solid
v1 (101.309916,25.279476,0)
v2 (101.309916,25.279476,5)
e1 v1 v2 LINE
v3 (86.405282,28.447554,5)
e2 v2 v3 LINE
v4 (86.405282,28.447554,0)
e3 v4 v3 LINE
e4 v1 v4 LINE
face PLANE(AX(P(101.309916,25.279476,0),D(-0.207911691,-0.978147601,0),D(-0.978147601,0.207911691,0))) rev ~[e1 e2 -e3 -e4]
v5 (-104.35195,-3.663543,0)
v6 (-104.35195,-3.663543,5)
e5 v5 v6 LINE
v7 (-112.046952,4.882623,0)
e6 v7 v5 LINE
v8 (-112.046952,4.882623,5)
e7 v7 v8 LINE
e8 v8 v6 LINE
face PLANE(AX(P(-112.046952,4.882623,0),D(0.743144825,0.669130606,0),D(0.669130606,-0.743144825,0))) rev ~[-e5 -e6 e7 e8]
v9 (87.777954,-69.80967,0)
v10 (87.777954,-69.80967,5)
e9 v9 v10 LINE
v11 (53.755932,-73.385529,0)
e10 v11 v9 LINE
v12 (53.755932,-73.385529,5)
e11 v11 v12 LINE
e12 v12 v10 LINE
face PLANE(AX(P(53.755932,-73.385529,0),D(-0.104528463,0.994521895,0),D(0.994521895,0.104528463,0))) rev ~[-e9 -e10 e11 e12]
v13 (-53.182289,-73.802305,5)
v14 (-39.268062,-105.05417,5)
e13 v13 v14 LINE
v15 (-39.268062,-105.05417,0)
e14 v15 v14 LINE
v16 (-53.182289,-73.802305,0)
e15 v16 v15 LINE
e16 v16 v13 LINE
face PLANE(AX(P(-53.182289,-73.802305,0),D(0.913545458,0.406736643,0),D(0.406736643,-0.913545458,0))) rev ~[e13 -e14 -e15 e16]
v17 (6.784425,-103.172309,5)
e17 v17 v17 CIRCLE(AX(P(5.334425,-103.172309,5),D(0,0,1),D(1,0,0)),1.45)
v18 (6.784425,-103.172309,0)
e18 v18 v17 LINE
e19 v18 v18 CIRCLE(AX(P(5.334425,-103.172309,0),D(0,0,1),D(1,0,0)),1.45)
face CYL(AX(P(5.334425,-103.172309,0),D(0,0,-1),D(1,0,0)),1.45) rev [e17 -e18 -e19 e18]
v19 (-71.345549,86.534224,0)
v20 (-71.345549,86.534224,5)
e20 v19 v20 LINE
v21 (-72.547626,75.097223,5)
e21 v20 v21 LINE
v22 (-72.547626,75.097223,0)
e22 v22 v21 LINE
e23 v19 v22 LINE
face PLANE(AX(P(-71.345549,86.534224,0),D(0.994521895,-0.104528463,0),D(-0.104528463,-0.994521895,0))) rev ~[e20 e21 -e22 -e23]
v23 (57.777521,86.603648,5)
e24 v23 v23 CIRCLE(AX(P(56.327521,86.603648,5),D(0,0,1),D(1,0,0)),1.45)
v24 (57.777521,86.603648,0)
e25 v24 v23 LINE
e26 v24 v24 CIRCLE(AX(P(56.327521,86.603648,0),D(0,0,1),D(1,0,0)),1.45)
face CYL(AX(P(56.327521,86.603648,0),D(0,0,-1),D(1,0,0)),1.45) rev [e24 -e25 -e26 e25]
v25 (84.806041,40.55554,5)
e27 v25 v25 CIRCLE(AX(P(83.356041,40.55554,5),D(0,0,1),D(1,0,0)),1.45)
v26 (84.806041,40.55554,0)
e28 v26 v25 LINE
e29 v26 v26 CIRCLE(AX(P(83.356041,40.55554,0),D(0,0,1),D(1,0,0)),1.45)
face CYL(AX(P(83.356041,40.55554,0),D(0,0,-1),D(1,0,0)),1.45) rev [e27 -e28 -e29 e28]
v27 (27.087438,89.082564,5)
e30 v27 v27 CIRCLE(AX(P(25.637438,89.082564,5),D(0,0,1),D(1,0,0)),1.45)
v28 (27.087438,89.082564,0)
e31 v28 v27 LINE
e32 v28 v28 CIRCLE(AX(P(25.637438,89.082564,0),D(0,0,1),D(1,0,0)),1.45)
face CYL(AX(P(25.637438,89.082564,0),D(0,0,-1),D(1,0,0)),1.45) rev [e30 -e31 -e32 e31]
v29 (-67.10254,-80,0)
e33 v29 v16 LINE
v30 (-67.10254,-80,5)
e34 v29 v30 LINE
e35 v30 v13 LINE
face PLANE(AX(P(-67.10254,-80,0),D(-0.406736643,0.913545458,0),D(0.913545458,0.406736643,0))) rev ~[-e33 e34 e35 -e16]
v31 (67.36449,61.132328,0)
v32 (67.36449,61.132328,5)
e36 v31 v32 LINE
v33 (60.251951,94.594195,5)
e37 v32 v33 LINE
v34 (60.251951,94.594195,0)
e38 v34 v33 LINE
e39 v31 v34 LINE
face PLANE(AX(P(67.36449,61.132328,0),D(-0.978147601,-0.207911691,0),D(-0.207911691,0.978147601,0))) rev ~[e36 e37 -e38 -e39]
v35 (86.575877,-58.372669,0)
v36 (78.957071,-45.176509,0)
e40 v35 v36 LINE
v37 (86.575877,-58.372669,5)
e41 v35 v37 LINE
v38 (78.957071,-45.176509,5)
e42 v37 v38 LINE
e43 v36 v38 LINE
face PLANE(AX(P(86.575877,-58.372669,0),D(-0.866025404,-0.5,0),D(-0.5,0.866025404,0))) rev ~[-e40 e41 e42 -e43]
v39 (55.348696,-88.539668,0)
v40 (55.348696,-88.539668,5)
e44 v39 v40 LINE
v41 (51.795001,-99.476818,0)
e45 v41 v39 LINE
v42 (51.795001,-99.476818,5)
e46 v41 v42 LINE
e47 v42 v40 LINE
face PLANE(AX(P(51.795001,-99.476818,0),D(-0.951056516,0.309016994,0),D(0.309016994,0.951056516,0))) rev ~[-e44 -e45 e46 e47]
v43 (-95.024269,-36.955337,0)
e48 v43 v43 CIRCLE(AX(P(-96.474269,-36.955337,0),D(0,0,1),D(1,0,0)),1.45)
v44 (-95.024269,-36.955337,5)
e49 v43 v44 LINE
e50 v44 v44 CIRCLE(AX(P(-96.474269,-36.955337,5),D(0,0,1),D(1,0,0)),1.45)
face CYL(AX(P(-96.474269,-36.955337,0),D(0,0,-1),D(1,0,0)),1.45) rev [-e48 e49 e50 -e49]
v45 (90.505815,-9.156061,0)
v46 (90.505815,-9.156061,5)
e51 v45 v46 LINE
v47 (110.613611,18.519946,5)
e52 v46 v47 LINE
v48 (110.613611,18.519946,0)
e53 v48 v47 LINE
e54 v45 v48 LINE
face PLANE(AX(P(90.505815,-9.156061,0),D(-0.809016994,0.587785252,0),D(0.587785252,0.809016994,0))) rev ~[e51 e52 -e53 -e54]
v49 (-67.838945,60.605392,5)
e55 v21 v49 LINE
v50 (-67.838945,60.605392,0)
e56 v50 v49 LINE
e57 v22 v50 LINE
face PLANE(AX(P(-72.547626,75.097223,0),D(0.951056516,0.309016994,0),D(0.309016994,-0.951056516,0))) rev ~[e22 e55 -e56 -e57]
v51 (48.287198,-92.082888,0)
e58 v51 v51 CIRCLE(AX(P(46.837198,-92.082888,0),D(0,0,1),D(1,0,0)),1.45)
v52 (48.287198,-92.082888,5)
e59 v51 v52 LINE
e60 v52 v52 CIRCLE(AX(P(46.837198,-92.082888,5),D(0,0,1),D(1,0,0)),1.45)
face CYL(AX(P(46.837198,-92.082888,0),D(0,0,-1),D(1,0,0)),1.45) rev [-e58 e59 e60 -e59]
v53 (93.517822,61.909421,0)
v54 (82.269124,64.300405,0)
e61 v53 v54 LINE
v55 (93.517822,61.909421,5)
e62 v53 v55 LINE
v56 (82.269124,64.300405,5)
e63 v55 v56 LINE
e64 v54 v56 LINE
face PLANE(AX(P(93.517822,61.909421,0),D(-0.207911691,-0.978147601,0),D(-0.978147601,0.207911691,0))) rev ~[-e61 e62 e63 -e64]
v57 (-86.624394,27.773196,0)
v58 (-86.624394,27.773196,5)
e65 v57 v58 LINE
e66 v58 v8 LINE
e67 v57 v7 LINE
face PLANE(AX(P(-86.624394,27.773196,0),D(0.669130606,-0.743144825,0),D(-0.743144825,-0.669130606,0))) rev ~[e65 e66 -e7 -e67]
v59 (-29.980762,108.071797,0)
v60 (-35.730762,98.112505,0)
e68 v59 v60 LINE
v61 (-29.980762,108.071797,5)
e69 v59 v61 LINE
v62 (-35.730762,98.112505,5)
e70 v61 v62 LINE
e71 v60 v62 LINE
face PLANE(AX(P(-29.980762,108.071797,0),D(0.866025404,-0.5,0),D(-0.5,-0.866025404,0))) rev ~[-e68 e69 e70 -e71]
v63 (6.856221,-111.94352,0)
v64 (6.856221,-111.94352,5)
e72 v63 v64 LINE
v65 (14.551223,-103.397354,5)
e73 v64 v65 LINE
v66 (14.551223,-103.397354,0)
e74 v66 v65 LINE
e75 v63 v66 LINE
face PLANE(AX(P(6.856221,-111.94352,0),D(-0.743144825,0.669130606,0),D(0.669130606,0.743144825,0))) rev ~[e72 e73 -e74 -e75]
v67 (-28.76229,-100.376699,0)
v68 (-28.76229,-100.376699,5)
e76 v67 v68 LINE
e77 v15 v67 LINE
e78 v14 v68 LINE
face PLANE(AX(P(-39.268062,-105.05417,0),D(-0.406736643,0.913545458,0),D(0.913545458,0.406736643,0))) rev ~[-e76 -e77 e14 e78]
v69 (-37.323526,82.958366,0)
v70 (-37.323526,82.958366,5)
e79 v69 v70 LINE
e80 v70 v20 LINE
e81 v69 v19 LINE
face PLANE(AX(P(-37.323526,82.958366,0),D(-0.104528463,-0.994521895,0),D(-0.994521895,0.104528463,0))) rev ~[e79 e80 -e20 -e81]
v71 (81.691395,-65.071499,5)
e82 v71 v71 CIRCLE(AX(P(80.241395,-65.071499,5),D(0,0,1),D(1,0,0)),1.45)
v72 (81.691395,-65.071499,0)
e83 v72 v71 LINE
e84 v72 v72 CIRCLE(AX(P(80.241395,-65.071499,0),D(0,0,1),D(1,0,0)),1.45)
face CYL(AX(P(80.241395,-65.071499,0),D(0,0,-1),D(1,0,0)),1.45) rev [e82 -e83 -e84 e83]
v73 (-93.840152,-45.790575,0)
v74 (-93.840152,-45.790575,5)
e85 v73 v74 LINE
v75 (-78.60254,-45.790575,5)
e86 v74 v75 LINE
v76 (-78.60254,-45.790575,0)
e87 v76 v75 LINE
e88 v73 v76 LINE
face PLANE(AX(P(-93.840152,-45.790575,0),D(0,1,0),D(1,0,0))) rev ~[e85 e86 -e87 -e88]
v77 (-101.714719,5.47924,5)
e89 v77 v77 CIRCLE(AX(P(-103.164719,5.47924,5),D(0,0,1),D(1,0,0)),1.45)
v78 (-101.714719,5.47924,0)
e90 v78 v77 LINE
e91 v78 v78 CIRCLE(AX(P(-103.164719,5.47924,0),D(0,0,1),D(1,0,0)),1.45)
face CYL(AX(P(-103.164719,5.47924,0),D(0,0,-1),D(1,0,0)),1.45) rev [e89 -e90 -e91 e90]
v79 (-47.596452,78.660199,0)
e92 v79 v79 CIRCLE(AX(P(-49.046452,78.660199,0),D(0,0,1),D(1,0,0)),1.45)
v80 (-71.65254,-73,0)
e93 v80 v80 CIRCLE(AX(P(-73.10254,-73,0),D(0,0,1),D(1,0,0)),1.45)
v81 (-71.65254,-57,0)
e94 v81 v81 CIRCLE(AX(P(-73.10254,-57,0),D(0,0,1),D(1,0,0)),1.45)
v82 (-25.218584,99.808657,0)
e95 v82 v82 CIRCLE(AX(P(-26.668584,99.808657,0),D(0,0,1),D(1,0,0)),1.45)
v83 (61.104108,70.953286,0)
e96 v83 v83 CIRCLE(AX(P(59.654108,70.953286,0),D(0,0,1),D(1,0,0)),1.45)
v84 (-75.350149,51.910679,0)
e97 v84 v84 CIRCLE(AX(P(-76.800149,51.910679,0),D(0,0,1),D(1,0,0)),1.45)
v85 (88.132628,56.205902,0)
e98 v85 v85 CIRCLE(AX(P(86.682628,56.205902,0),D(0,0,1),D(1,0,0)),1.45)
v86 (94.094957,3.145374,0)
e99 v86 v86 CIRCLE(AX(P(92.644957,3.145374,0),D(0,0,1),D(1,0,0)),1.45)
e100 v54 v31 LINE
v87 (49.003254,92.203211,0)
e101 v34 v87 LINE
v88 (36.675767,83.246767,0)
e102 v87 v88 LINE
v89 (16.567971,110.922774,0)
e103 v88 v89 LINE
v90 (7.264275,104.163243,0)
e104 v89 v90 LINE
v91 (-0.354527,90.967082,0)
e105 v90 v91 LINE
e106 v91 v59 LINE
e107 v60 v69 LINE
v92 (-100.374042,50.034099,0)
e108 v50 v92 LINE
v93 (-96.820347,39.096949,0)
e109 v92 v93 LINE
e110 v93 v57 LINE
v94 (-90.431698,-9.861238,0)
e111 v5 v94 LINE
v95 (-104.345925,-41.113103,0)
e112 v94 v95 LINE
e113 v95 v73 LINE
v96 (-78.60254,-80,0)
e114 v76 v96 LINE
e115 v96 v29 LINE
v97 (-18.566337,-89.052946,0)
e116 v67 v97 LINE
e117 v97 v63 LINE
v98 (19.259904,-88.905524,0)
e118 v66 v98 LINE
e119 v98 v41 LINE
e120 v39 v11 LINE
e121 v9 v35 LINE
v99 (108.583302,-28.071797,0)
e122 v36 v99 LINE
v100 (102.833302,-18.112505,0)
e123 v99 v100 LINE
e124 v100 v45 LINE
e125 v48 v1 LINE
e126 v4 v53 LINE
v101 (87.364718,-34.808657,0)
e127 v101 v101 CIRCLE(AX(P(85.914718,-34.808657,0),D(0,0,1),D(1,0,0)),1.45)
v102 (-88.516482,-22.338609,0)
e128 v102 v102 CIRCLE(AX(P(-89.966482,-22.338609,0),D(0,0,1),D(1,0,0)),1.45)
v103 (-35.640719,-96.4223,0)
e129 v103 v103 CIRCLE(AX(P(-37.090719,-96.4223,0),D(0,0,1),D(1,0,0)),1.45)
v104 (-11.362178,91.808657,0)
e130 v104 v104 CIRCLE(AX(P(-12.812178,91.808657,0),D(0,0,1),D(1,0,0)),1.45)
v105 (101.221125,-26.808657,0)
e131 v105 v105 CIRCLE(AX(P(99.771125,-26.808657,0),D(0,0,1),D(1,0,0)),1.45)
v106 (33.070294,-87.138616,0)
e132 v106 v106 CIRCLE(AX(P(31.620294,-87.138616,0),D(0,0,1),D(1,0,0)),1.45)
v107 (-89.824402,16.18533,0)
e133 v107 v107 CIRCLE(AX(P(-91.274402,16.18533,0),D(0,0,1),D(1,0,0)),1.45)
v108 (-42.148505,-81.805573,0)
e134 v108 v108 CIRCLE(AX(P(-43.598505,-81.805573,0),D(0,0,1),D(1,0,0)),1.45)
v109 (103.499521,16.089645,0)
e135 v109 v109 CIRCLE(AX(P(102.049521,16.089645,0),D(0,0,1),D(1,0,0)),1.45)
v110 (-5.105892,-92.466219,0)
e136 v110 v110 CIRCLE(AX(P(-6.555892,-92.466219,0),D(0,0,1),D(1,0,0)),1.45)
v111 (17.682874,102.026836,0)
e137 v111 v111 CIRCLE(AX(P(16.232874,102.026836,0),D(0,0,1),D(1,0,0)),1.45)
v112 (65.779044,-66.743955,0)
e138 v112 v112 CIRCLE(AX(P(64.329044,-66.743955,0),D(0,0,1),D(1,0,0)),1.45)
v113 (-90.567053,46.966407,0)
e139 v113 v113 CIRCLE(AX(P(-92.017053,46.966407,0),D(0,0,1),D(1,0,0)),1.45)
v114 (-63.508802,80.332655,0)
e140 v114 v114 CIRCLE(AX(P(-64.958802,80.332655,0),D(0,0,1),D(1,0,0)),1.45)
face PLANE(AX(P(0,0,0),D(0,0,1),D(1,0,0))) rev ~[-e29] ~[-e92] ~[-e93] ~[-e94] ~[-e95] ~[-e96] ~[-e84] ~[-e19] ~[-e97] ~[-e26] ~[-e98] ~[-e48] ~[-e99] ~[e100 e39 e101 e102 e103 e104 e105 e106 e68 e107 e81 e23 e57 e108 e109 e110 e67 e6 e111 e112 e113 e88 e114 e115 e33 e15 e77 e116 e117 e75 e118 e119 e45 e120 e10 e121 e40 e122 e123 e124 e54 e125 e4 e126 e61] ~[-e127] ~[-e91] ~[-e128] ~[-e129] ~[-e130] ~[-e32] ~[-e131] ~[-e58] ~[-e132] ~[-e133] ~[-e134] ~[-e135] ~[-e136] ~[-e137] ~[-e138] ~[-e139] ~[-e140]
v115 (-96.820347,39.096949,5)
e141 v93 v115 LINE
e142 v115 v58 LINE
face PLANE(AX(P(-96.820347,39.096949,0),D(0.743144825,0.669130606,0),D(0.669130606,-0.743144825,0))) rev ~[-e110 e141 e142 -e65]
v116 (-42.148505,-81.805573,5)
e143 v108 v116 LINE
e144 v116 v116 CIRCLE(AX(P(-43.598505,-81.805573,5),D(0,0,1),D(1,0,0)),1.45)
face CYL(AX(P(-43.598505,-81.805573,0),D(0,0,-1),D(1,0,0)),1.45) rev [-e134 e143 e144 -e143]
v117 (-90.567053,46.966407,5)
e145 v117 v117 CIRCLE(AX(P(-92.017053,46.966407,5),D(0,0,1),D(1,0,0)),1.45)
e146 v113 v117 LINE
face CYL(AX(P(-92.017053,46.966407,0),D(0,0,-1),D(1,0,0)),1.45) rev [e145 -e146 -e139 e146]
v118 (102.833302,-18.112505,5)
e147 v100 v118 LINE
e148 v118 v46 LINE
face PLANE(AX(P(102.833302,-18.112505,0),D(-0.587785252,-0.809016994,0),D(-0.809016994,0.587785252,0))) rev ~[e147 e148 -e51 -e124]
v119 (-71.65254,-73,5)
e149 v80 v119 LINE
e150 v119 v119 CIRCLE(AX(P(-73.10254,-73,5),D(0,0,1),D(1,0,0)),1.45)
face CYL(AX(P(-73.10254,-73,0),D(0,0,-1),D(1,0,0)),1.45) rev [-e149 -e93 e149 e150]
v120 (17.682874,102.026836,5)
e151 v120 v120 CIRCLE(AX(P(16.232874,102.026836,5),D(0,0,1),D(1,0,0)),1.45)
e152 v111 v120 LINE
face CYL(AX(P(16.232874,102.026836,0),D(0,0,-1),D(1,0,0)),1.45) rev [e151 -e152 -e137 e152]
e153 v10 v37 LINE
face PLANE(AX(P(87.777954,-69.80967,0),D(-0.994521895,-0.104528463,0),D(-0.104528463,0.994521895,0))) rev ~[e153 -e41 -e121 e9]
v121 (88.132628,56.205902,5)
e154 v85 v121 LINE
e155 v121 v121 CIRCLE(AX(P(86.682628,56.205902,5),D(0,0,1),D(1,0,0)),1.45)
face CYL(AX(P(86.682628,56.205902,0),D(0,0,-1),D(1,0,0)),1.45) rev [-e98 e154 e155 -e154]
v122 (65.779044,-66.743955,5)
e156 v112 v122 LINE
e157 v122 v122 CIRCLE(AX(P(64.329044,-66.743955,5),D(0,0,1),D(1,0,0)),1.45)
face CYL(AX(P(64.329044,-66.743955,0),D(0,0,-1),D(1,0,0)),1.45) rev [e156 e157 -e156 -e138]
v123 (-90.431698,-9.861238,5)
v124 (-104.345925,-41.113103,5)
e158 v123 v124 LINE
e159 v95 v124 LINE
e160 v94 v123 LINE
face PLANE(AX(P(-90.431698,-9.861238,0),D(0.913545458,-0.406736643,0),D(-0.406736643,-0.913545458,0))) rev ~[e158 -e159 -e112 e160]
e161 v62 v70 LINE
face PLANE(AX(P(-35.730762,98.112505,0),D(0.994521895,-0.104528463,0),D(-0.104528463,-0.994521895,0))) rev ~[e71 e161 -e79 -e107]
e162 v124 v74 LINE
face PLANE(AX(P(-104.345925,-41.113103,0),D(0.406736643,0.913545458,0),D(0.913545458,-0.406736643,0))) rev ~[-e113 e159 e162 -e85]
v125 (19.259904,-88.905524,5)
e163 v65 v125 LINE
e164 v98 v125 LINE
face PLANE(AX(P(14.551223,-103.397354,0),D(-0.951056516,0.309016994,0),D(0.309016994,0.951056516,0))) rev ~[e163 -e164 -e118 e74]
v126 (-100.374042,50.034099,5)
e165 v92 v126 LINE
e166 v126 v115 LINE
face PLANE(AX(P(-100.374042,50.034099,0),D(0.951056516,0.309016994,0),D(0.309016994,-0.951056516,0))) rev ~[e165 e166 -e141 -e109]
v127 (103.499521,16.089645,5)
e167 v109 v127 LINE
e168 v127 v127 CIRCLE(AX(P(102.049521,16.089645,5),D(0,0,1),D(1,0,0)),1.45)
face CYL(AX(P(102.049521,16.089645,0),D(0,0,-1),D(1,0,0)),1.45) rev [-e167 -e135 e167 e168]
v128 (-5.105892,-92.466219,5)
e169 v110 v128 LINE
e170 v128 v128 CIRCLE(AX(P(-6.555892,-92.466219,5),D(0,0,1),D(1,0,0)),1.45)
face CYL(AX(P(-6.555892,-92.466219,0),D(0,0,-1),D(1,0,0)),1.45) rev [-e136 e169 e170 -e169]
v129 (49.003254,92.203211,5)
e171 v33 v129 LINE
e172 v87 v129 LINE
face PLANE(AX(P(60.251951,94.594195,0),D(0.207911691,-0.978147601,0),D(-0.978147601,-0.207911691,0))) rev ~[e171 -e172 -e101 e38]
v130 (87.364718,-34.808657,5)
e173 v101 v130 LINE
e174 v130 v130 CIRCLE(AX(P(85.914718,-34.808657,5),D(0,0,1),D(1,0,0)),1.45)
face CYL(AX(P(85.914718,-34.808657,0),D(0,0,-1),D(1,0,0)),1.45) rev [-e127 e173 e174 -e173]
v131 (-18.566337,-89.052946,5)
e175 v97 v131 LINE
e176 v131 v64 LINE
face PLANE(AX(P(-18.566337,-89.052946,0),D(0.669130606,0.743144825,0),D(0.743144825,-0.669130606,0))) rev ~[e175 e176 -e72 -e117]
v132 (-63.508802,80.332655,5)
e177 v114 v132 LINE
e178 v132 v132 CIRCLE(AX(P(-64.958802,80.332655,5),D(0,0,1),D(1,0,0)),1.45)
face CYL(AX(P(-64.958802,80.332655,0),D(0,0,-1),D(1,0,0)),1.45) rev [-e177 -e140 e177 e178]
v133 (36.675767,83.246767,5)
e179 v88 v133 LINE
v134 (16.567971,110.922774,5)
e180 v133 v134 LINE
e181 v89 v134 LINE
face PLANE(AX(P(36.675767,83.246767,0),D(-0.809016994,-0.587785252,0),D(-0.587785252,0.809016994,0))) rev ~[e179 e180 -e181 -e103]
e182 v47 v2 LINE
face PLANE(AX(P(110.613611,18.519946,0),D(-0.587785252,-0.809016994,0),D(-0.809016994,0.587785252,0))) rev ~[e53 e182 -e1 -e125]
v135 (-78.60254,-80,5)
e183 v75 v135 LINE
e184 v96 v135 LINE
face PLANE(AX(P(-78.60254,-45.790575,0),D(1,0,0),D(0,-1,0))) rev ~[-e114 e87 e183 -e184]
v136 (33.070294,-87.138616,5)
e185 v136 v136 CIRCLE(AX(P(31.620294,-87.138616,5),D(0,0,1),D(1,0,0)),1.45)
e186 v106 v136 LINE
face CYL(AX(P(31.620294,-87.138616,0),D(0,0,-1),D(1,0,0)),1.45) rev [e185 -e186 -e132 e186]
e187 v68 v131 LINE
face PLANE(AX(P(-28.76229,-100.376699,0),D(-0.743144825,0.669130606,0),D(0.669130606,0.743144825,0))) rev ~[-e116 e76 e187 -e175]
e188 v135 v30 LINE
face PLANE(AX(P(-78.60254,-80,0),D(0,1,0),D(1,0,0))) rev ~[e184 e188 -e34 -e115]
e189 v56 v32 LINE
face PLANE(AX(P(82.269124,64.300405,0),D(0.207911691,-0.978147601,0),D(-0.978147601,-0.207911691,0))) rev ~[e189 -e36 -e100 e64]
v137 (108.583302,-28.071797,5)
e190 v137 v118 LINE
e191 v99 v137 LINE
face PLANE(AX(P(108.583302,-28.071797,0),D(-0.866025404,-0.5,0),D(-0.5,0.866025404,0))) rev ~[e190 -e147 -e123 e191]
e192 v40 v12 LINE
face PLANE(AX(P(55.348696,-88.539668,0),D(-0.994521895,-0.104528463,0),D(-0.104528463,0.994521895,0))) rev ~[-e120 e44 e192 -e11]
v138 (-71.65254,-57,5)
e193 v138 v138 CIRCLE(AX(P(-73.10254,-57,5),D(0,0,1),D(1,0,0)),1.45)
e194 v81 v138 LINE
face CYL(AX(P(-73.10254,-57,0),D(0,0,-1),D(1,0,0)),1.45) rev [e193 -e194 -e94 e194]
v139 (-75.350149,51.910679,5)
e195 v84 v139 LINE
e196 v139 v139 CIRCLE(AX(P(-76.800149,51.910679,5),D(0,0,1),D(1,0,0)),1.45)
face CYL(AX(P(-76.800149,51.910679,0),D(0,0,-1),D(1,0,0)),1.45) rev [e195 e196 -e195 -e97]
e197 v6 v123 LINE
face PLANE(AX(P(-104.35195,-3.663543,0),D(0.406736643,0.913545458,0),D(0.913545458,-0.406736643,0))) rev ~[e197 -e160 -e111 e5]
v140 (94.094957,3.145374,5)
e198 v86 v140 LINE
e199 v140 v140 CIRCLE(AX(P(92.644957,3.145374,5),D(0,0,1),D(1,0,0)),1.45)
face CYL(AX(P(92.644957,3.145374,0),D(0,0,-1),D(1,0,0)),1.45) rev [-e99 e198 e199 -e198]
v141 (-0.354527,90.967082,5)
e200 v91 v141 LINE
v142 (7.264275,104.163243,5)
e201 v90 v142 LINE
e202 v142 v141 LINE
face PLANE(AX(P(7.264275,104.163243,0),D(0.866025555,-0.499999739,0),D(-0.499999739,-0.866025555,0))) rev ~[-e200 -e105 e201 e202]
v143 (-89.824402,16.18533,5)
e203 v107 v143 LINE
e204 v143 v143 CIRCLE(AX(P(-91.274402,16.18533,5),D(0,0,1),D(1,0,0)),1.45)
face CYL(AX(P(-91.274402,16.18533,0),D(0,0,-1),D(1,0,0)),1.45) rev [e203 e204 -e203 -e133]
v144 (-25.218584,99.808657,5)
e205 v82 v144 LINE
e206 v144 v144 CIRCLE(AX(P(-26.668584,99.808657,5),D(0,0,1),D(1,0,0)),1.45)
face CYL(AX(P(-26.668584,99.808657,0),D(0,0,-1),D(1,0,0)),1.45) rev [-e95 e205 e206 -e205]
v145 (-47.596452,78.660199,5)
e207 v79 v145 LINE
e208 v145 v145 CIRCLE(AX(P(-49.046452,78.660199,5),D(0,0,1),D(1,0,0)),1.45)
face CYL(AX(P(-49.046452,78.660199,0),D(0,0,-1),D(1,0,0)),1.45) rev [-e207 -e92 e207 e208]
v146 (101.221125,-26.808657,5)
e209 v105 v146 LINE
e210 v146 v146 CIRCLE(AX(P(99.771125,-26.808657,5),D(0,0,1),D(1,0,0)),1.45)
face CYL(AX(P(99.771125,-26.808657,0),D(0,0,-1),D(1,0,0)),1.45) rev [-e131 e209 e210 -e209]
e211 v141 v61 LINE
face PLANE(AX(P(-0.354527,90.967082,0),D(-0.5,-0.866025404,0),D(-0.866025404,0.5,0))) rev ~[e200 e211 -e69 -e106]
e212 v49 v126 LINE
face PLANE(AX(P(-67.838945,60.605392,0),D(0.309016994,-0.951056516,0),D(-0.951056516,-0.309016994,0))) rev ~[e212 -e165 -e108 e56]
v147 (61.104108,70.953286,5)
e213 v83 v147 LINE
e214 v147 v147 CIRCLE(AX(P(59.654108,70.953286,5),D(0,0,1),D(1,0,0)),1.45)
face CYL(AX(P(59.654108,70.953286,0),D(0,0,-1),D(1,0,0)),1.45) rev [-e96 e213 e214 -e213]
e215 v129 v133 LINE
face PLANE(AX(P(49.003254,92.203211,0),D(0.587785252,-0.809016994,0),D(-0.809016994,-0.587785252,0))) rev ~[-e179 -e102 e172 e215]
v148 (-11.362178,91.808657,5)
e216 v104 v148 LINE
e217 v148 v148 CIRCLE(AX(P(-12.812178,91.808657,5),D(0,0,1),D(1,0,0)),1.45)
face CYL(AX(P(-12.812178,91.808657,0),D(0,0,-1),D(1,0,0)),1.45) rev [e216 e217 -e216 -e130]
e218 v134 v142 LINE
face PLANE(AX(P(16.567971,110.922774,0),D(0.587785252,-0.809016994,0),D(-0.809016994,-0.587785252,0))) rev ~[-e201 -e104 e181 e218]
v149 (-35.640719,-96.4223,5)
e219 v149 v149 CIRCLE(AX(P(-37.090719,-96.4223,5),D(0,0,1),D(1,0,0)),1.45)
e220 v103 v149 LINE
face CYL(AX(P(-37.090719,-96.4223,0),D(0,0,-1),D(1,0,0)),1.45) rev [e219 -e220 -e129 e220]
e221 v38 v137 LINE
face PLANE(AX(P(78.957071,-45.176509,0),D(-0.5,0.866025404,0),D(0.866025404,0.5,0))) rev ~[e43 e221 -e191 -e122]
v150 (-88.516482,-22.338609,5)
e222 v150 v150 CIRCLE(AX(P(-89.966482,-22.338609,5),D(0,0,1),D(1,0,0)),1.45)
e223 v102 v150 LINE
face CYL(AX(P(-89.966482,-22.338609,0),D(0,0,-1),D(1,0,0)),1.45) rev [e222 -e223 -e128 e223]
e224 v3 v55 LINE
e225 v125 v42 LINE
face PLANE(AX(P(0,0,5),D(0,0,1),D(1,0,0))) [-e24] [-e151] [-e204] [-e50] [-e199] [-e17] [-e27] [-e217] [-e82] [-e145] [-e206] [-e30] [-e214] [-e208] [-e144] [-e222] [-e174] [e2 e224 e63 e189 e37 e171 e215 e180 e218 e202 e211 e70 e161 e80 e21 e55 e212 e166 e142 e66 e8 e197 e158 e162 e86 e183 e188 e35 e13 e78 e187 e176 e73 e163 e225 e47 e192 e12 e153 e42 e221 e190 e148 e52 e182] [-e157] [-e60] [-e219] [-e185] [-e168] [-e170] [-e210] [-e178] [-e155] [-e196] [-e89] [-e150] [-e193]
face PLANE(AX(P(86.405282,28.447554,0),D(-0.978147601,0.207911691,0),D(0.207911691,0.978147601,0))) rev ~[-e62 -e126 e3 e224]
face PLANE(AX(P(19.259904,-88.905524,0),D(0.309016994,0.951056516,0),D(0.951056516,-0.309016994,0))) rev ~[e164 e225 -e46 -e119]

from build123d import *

# Parameters (mm, degrees)
F0_R     = 1.45
F1_DEPTH = 5


# Not quite as in the source:
# - ends of sketch curves that miss each other by under 0.0002 mm in the source are joined


with BuildPart() as f1:
    # F0 (on Top) → F1 (new body)
    with BuildSketch(Plane.XY):
        Polygon((-0.3545266845, 90.9670817697), (-29.9807621135, 108.0717967697), (-35.7307621135, 98.1125046262), (-37.3235262825, 82.9583658326), (-71.3455488748, 86.5342244993), (-72.5476262023, 75.0972227026), (-67.8389451324, 60.6053924919), (-100.3740420816, 50.0340986743), (-96.8203466463, 39.0969487369), (-86.6243940714, 27.7731962067), (-112.046951543, 4.8826226429), (-104.3519495698, -3.6635428501), (-90.4316983176, -9.8612380143), (-104.345925168, -41.1131032006), (-93.8401524051, -45.790574596), (-78.6025403784, -45.790574596), (-78.6025403784, -80), (-67.1025403784, -80), (-53.1822891262, -73.8023048358), (-39.2680622758, -105.0541700222), (-28.7622895129, -100.3766986268), (-18.5663369381, -89.0529460966), (6.8562205334, -111.9435196603), (14.5512225065, -103.3973541673), (19.2599035765, -88.9055239566), (51.7950005256, -99.4768177743), (55.3486959609, -88.5396678369), (53.7559317919, -73.3855290433), (87.7779543842, -69.8096703765), (86.5758770566, -58.3726685798), (78.9570710433, -45.1765094717), (108.583302492, -28.0717967697), (102.833302492, -18.1125046262), (90.5058154087, -9.1560609968), (110.6136111506, 18.5199455228), (101.3099157153, 25.2794759242), (86.4052820705, 28.4475536047), (93.5178215482, 61.9094209861), (82.2691241397, 64.3004054305), (67.364490495, 61.13232775), (60.2519510173, 94.5941951314), (49.0032536089, 92.203210687), (36.6757665257, 83.2467670575), (16.5679707838, 110.9227735772), (7.2642753485, 104.1632431758), align=None)
        with Locations((-73.1025403784, -73)):
            Circle(F0_R, mode=Mode.SUBTRACT)
        with Locations((-73.1025403784, -57)):
            Circle(F0_R, mode=Mode.SUBTRACT)
        with Locations((-37.0907187603, -96.4223002818)):
            Circle(F0_R, mode=Mode.SUBTRACT)
        with Locations((-6.5558921176, -92.4662191739)):
            Circle(F0_R, mode=Mode.SUBTRACT)
        with Locations((-43.5985050495, -81.8055729595)):
            Circle(F0_R, mode=Mode.SUBTRACT)
        with Locations((-96.4742686494, -36.9553365341)):
            Circle(F0_R, mode=Mode.SUBTRACT)
        with Locations((-89.9664823602, -22.3386092118)):
            Circle(F0_R, mode=Mode.SUBTRACT)
        with Locations((5.33442509, -103.1723088757)):
            Circle(F0_R, mode=Mode.SUBTRACT)
        with Locations((31.6202941199, -87.138616064)):
            Circle(F0_R, mode=Mode.SUBTRACT)
        with Locations((46.8371983806, -92.082887974)):
            Circle(F0_R, mode=Mode.SUBTRACT)
        with Locations((64.3290442427, -66.7439546071)):
            Circle(F0_R, mode=Mode.SUBTRACT)
        with Locations((80.2413945686, -65.0714991949)):
            Circle(F0_R, mode=Mode.SUBTRACT)
        with Locations((85.9147182049, -34.8086570489)):
            Circle(F0_R, mode=Mode.SUBTRACT)
        with Locations((99.7711246655, -26.8086570489)):
            Circle(F0_R, mode=Mode.SUBTRACT)
        with Locations((-103.1647194297, 5.4792403473)):
            Circle(F0_R, mode=Mode.SUBTRACT)
        with Locations((-91.274402222, 16.185330049)):
            Circle(F0_R, mode=Mode.SUBTRACT)
        with Locations((-92.0170529985, 46.9664067953)):
            Circle(F0_R, mode=Mode.SUBTRACT)
        with Locations((-76.8001487377, 51.9106787053)):
            Circle(F0_R, mode=Mode.SUBTRACT)
        with Locations((-64.9588021552, 80.3326548319)):
            Circle(F0_R, mode=Mode.SUBTRACT)
        with Locations((-49.0464518293, 78.6601994197)):
            Circle(F0_R, mode=Mode.SUBTRACT)
        with Locations((-12.8121778265, 91.8086570489)):
            Circle(F0_R, mode=Mode.SUBTRACT)
        with Locations((-26.668584287, 99.8086570489)):
            Circle(F0_R, mode=Mode.SUBTRACT)
        with Locations((92.6449568788, 3.1453735398)):
            Circle(F0_R, mode=Mode.SUBTRACT)
        with Locations((102.0495209155, 16.0896454498)):
            Circle(F0_R, mode=Mode.SUBTRACT)
        with Locations((83.3560408553, 40.5555404687)):
            Circle(F0_R, mode=Mode.SUBTRACT)
        with Locations((25.6374381175, 89.0825638189)):
            Circle(F0_R, mode=Mode.SUBTRACT)
        with Locations((16.2328740808, 102.0268357289)):
            Circle(F0_R, mode=Mode.SUBTRACT)
        with Locations((59.6541081021, 70.953286015)):
            Circle(F0_R, mode=Mode.SUBTRACT)
        with Locations((86.6826279084, 56.2059020804)):
            Circle(F0_R, mode=Mode.SUBTRACT)
        with Locations((56.327521049, 86.6036476267)):
            Circle(F0_R, mode=Mode.SUBTRACT)
    extrude(amount=F1_DEPTH)


solid = f1.part
